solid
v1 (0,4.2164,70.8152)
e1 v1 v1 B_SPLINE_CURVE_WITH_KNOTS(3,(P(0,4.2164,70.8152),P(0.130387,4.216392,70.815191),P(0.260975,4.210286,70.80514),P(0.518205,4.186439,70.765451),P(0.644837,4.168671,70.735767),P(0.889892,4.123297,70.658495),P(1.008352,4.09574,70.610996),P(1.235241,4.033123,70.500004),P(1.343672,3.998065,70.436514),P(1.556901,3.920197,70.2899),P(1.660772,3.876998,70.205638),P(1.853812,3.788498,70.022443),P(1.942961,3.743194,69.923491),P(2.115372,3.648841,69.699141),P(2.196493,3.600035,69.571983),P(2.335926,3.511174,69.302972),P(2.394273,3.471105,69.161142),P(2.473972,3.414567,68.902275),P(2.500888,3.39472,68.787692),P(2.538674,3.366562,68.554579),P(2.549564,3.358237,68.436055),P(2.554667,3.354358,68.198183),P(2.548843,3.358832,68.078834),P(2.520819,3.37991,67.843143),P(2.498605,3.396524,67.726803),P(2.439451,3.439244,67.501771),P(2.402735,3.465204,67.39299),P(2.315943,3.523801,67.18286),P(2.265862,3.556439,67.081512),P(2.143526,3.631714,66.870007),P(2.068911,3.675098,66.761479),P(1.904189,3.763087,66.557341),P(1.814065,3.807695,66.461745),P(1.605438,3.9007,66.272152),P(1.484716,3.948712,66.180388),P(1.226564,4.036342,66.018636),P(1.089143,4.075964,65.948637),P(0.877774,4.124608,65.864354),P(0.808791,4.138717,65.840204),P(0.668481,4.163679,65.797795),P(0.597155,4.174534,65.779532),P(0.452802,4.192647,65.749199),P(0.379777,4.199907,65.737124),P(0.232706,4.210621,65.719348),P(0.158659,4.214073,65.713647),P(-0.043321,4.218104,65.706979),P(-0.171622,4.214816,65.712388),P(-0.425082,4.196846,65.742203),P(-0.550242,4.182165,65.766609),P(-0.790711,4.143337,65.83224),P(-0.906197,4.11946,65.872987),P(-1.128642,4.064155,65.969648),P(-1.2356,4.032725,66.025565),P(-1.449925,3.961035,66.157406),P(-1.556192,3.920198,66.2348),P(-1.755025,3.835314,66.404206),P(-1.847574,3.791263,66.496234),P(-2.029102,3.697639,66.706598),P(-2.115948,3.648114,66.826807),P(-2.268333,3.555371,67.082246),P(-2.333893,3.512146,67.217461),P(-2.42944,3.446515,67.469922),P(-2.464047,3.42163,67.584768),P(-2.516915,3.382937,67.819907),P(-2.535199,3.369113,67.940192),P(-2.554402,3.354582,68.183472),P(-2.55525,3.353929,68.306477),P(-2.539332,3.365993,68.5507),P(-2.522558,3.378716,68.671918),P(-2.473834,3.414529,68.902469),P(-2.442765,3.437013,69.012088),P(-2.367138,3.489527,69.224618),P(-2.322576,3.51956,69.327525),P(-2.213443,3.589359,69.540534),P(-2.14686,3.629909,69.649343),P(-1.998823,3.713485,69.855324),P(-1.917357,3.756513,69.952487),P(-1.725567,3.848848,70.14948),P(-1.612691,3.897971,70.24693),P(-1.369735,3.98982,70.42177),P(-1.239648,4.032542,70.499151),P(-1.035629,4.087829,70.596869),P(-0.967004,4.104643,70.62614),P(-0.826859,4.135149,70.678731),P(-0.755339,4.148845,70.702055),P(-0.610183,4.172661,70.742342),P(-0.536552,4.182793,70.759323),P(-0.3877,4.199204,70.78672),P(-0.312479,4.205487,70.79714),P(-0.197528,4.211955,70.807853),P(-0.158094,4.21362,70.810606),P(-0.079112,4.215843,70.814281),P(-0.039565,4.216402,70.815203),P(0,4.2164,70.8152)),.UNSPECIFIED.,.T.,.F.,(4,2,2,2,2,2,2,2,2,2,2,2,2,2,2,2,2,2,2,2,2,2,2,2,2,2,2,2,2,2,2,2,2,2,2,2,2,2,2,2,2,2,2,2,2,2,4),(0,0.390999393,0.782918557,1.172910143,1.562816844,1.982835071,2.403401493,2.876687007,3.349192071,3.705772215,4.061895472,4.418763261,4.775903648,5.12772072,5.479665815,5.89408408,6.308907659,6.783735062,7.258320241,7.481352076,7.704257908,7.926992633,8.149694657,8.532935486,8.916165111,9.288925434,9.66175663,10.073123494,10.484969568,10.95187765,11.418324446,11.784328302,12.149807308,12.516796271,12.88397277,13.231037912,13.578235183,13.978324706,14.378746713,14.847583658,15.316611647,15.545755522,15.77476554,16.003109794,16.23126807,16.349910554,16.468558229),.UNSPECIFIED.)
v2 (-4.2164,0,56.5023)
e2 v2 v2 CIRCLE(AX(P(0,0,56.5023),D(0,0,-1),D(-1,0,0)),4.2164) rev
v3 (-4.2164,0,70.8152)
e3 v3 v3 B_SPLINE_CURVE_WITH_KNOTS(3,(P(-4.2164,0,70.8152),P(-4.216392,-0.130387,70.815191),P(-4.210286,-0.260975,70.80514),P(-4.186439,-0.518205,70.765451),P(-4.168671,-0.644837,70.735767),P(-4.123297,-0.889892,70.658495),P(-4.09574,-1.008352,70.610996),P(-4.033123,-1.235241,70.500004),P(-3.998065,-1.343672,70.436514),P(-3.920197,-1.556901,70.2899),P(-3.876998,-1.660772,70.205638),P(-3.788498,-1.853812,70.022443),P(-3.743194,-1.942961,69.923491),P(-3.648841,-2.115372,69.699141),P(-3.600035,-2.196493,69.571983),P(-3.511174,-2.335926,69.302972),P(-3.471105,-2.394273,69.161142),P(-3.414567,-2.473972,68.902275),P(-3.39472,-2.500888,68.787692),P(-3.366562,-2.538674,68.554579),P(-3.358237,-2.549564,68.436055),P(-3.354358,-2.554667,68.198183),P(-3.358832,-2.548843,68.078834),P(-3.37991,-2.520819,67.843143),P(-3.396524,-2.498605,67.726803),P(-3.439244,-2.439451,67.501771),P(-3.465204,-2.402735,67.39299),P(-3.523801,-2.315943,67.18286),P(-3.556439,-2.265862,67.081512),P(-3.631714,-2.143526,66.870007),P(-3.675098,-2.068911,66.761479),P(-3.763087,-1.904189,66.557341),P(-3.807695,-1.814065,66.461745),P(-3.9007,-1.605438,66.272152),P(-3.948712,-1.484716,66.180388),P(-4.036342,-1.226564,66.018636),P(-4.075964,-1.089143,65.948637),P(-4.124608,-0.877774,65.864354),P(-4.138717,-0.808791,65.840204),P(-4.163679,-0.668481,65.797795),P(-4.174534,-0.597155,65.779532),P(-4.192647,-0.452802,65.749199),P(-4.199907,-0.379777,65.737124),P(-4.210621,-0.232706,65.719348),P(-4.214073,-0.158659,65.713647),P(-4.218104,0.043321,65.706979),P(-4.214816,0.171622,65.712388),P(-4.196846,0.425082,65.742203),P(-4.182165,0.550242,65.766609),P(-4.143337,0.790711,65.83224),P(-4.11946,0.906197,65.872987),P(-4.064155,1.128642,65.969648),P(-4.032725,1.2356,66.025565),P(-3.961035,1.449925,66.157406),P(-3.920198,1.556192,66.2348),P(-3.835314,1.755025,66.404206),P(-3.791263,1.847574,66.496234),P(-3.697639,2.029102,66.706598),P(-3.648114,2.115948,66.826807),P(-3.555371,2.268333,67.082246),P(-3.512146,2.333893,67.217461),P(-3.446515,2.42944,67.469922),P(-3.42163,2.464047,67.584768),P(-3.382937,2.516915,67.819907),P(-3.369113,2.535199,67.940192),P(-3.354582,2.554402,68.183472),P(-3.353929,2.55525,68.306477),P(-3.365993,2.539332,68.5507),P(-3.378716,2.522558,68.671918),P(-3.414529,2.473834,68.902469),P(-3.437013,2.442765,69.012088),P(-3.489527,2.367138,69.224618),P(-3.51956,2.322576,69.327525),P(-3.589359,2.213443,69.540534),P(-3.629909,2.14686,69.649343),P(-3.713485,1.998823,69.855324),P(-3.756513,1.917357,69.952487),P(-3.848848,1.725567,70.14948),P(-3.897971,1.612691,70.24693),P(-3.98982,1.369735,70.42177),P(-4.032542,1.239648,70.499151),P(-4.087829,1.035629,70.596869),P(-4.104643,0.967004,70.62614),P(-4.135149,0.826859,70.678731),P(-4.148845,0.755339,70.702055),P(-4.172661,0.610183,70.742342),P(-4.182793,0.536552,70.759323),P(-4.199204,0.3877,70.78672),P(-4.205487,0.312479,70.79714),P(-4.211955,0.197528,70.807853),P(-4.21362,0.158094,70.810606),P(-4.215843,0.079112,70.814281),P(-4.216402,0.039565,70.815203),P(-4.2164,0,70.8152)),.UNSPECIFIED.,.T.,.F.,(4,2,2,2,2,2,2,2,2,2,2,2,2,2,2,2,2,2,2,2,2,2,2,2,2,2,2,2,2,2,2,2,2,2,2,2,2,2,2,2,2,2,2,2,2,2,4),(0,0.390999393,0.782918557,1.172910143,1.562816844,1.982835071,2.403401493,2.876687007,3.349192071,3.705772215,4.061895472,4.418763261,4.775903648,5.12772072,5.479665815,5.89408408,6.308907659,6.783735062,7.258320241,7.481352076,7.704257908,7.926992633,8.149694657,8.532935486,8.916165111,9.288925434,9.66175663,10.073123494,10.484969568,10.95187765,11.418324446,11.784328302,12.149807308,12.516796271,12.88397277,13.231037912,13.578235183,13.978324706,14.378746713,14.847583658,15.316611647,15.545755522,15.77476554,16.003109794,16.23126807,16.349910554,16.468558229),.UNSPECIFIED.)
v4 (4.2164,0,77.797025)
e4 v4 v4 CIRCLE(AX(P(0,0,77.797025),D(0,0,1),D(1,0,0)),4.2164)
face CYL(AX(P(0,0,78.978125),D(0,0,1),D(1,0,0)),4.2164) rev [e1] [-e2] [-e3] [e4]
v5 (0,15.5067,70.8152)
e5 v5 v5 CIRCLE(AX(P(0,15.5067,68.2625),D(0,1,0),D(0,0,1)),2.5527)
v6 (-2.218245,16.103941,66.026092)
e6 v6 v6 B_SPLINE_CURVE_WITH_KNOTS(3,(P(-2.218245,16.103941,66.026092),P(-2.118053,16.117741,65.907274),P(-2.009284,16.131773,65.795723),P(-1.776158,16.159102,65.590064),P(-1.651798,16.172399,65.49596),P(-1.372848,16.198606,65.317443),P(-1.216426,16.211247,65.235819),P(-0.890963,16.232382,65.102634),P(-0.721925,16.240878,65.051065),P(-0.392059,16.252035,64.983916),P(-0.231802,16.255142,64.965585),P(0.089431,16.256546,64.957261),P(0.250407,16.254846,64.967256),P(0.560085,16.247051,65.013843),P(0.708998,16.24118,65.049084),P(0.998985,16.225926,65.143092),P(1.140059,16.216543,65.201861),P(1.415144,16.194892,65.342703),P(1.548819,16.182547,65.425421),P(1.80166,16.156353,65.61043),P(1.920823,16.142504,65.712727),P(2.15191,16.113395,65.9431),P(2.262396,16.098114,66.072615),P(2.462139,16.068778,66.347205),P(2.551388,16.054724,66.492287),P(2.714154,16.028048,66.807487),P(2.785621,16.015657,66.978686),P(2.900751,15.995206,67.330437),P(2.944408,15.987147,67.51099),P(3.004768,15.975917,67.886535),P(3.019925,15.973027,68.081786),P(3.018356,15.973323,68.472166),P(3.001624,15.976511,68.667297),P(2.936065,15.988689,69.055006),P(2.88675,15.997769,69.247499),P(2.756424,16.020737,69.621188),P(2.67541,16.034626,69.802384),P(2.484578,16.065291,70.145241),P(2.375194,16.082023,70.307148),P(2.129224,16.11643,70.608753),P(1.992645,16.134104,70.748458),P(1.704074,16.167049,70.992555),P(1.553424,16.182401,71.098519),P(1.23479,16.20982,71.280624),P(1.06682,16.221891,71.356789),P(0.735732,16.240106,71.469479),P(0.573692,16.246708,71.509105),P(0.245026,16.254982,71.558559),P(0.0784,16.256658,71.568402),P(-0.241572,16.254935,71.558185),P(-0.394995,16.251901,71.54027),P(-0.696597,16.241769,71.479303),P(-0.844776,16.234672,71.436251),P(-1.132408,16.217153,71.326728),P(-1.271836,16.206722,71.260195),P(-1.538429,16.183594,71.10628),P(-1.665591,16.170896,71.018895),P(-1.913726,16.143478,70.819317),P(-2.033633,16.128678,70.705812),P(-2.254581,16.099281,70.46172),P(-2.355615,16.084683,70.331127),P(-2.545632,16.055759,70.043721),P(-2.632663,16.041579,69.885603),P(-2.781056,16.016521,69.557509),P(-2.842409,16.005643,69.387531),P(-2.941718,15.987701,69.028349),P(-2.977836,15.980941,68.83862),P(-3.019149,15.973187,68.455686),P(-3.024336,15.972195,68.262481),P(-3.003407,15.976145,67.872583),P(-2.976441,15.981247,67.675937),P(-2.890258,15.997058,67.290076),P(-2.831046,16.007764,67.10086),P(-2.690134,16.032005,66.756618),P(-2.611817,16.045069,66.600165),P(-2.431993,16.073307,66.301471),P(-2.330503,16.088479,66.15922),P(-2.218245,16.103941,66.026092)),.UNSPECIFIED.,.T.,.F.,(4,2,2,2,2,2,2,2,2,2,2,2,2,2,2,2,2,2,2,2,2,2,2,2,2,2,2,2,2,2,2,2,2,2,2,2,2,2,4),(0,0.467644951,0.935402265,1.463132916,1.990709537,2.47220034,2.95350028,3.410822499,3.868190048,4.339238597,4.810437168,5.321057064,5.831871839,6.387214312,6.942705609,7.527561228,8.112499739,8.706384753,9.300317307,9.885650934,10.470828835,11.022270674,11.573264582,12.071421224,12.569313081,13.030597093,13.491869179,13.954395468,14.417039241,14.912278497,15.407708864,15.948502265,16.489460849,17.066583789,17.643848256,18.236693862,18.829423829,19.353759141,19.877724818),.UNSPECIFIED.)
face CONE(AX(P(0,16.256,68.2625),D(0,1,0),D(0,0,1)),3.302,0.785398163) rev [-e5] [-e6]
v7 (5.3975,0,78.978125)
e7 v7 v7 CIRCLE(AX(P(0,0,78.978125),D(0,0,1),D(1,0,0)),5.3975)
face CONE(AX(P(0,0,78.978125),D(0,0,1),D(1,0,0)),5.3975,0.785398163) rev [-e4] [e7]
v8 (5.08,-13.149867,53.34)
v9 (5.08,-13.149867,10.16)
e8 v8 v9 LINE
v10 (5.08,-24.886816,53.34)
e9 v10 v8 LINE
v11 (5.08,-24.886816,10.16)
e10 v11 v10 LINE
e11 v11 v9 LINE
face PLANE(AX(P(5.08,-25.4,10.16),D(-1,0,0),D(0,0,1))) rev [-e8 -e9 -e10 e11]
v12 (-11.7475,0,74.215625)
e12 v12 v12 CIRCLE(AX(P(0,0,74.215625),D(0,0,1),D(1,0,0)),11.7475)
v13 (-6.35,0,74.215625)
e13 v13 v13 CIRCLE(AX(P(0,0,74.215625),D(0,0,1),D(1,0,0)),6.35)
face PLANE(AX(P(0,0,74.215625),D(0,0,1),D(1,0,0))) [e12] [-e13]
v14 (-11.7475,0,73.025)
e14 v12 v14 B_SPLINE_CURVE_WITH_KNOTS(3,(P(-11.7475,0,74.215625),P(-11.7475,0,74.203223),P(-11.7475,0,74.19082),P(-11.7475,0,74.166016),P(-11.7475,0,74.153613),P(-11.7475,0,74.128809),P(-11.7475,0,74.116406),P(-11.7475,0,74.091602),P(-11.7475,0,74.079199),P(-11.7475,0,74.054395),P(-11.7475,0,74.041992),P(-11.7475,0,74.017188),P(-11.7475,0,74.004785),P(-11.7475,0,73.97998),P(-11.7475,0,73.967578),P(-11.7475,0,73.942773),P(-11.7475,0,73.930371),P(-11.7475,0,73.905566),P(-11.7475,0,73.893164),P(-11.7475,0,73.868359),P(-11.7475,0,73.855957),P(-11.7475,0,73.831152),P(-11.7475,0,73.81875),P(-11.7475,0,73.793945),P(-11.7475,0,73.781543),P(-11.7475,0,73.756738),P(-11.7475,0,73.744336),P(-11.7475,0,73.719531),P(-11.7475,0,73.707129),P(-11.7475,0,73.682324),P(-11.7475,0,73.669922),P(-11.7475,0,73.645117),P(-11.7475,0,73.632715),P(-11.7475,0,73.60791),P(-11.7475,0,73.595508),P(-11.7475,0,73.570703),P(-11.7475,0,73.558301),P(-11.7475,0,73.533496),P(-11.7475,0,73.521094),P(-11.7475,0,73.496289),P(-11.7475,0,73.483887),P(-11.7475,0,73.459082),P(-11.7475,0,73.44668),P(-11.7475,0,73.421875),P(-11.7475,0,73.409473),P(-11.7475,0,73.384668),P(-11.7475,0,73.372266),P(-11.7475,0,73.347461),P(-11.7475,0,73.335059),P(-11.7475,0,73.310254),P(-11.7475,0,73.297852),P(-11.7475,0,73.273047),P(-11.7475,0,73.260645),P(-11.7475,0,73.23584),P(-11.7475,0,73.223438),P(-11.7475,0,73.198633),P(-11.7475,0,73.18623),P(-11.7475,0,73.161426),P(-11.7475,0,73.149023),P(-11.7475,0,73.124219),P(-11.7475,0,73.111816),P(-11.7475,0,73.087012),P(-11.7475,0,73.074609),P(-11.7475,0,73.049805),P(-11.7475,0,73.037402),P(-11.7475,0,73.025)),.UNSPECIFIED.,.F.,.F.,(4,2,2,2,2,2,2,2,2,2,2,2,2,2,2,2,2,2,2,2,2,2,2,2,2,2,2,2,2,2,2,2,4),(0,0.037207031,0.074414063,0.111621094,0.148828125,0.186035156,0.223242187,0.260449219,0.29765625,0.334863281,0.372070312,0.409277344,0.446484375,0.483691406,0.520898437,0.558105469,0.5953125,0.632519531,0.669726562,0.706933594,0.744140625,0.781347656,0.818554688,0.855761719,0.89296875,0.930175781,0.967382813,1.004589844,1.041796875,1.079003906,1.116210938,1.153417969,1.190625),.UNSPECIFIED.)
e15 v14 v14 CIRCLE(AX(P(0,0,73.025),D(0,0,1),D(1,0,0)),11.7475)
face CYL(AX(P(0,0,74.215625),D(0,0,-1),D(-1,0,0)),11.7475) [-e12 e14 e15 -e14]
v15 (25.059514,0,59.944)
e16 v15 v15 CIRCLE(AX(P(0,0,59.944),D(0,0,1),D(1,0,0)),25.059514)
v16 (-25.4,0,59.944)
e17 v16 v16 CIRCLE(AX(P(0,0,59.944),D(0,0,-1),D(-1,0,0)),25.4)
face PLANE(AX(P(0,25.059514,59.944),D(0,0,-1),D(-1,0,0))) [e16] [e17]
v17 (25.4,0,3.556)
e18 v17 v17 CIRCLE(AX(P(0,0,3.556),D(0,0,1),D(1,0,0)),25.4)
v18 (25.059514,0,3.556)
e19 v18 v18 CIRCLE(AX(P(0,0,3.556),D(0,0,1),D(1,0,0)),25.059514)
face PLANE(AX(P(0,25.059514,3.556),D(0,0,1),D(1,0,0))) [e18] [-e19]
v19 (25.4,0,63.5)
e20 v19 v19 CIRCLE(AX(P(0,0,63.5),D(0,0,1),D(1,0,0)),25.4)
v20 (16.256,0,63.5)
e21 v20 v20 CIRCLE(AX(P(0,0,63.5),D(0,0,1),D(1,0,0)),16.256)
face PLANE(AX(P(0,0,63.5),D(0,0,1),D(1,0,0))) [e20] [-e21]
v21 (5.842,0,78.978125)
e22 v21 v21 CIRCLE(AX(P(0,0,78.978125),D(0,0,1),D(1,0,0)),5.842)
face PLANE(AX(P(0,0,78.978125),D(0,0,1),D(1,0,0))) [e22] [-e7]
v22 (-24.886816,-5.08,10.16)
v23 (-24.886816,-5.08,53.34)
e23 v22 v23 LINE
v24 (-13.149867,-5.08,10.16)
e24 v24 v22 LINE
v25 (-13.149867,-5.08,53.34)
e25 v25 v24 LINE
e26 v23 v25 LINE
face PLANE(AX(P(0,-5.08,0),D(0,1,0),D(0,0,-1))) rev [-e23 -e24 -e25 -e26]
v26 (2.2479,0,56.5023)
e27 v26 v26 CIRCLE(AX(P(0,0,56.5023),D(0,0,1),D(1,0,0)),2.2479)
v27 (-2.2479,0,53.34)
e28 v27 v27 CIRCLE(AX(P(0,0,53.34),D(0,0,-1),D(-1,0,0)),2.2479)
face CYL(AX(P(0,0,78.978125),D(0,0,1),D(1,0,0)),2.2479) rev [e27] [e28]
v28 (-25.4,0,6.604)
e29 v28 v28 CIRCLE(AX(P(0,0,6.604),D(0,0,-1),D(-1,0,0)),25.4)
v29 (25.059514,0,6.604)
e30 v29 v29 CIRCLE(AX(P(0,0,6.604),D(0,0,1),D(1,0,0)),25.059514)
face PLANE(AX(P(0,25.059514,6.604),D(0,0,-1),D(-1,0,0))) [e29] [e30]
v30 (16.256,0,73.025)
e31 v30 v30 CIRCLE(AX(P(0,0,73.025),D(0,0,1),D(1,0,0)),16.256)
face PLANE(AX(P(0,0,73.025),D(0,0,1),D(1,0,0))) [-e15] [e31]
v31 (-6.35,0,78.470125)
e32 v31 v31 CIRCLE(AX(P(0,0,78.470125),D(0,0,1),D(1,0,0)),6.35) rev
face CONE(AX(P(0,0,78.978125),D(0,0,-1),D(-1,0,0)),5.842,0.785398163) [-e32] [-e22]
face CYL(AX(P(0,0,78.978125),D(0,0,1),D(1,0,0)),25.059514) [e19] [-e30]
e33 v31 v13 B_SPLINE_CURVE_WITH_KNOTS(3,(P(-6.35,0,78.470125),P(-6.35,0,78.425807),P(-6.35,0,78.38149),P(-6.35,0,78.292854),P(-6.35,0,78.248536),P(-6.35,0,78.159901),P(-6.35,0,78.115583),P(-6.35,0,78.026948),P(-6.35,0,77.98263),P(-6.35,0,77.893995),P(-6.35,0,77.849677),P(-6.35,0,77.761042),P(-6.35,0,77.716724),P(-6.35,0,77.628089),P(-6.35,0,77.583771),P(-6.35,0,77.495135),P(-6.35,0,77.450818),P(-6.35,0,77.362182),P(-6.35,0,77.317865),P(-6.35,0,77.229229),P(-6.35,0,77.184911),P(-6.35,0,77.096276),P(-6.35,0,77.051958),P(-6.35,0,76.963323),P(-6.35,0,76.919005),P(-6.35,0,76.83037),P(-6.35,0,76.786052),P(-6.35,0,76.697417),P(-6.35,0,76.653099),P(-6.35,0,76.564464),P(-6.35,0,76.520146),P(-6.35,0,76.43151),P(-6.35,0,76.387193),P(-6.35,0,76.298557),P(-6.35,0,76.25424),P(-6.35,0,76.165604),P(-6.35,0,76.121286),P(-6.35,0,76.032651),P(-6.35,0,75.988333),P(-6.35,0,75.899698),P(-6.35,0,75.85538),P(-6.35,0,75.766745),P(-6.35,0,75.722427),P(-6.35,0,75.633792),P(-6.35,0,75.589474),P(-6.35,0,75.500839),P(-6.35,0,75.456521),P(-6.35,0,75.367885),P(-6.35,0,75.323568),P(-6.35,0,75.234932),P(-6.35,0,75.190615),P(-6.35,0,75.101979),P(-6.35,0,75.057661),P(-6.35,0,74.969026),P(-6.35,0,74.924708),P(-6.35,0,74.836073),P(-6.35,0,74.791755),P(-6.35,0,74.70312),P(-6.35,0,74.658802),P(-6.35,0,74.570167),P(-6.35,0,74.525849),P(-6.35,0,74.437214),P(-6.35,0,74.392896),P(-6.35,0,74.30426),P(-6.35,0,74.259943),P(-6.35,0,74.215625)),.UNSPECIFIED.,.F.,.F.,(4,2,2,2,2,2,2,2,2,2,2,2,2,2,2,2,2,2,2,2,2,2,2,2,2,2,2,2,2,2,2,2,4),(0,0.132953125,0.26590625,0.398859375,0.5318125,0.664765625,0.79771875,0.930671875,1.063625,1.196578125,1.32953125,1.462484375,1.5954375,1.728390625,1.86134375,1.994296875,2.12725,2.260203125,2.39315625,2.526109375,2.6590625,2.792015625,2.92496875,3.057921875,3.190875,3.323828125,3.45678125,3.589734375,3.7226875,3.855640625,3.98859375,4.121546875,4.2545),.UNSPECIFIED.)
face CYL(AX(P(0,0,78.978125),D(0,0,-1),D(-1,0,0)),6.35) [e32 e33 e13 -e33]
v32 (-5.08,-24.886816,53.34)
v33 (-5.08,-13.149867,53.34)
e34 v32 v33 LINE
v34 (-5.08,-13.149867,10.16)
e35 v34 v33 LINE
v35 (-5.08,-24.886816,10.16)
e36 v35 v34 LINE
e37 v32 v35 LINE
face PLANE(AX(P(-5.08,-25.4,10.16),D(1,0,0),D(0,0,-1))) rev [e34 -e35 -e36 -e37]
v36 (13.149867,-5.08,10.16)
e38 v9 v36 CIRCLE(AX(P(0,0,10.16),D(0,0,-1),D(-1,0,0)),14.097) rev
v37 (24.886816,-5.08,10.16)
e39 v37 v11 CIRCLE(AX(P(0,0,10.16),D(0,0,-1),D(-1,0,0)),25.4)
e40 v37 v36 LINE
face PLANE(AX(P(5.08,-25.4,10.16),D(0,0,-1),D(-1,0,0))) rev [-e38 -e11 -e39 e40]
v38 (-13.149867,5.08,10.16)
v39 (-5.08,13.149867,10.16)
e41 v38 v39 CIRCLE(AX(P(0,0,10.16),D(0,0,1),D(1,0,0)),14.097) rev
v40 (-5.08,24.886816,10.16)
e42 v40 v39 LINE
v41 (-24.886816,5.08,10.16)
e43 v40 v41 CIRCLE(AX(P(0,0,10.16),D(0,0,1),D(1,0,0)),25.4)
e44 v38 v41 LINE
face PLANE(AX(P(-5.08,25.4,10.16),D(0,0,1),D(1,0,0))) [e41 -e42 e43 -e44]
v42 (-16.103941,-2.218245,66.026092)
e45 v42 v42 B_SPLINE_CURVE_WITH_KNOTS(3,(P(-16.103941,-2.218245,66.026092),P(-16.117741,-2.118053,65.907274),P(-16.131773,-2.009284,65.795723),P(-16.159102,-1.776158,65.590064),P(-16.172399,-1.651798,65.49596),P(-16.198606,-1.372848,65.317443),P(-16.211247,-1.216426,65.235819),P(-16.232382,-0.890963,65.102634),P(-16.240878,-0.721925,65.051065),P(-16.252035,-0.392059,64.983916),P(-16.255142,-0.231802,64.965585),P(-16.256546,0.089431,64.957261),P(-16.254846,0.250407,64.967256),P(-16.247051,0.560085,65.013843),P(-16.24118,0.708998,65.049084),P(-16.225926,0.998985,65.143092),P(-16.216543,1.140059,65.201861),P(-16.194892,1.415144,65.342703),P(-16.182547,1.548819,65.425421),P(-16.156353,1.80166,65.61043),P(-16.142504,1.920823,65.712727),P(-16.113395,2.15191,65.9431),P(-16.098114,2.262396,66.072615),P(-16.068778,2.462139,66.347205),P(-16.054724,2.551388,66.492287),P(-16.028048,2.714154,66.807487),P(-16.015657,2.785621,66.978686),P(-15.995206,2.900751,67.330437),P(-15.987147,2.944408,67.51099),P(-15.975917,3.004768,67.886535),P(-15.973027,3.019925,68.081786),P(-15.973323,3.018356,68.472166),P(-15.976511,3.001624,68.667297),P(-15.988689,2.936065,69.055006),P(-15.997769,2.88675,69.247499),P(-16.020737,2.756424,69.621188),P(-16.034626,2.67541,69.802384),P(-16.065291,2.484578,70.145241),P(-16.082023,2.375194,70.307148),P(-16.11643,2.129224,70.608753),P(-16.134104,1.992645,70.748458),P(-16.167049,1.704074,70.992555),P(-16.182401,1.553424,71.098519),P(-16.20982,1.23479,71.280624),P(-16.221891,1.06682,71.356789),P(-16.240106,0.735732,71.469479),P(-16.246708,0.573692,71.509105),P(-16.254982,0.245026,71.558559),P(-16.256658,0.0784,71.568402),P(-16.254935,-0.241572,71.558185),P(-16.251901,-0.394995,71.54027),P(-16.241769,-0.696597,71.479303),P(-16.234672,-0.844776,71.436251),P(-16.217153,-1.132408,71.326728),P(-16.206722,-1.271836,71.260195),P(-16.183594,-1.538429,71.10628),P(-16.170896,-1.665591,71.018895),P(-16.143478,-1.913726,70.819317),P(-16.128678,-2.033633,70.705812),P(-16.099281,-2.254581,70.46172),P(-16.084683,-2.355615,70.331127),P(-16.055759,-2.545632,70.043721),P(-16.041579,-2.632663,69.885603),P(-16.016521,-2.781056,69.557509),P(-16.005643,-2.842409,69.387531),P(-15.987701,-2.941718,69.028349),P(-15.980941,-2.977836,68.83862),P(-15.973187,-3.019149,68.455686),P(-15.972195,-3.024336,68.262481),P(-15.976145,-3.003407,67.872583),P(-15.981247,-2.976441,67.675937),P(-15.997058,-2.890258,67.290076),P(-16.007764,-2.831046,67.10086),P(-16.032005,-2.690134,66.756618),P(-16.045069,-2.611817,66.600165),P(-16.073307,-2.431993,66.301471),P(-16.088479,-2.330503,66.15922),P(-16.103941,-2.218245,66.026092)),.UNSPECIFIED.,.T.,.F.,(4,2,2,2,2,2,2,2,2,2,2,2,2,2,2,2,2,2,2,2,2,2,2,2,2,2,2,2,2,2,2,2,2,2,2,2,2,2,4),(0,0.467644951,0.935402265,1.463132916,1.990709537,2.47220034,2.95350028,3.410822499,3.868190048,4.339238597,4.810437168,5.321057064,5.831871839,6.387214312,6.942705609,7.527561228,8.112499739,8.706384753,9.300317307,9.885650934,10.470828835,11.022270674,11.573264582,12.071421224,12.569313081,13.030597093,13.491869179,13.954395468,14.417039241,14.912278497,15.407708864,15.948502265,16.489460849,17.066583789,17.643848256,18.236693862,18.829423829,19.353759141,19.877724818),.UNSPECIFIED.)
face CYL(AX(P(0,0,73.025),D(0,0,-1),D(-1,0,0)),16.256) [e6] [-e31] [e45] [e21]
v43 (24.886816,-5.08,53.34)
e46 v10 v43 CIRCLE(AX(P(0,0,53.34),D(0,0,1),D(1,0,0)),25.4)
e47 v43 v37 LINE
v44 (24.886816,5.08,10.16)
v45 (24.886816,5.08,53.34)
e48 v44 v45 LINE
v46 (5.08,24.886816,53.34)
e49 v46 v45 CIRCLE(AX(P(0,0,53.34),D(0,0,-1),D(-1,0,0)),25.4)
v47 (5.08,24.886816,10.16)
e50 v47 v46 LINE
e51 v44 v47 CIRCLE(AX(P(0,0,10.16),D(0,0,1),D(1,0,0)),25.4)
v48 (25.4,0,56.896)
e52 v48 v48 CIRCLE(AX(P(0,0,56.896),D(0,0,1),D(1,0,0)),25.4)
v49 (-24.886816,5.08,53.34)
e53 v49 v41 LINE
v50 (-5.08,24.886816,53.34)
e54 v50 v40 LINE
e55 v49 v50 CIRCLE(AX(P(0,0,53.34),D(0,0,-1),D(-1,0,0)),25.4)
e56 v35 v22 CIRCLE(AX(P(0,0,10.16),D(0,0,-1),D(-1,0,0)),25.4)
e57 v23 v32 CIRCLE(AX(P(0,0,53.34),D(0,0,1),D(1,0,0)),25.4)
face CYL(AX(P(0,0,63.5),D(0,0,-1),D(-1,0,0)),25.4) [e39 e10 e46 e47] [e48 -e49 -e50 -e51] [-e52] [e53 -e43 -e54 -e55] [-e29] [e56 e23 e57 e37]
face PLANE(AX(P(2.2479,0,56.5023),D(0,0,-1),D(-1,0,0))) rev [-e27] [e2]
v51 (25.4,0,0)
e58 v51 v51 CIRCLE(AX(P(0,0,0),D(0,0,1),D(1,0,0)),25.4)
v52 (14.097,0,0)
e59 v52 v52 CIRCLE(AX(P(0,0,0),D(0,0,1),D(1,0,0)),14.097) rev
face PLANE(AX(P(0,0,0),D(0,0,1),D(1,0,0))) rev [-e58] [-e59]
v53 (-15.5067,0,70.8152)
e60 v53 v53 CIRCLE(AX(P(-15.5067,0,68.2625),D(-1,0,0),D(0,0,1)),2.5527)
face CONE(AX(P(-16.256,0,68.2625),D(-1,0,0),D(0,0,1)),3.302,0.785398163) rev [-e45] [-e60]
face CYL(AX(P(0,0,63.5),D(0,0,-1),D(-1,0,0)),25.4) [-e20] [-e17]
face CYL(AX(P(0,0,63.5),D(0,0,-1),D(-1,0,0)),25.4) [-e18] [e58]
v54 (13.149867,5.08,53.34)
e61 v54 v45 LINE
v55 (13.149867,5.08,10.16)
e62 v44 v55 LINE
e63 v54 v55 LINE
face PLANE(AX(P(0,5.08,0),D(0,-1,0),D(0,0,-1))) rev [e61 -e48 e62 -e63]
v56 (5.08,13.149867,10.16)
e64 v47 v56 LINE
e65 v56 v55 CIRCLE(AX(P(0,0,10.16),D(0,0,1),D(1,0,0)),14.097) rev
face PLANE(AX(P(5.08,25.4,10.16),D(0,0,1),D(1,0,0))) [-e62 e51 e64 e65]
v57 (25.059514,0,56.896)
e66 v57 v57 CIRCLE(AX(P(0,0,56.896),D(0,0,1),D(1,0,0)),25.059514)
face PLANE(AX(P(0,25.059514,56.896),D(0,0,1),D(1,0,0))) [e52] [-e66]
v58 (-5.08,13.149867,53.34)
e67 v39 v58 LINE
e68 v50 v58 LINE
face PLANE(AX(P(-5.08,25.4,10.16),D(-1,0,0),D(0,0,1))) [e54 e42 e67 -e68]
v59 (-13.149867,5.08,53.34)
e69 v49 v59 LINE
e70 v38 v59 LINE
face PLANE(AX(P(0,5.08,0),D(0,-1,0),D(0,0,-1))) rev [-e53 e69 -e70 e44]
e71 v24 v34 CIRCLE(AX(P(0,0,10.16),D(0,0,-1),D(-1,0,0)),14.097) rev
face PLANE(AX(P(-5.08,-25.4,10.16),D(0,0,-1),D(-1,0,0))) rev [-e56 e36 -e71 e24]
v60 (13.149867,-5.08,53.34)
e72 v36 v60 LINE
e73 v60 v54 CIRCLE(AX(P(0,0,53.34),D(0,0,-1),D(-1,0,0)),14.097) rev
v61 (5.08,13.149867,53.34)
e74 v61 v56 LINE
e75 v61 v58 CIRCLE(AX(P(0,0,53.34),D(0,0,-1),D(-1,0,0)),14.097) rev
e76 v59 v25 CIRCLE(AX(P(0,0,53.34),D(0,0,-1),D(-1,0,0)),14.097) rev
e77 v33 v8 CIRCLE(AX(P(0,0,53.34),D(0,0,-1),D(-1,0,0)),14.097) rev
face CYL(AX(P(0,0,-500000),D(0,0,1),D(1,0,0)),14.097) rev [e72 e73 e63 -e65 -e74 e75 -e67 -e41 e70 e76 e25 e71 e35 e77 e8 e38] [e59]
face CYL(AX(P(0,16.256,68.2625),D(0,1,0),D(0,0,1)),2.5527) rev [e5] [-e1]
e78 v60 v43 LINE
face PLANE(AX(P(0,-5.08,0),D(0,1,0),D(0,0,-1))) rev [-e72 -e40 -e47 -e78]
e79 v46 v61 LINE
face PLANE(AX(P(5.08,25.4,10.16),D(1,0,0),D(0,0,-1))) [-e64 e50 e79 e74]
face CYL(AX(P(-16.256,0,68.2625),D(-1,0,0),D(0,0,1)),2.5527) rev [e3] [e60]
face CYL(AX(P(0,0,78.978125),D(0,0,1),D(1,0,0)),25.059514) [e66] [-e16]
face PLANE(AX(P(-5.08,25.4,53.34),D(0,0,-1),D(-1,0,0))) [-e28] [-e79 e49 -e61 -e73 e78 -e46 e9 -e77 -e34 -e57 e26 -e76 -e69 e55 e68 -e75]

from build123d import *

# Parameters (mm, degrees)
SKETCH1_R                                      = 25.4
BOSS_EXTRUDE1_DEPTH                            = 63.5
SKETCH2_R                                      = 14.097
CUT_EXTRUDE1_DEPTH                             = 63.5
SKETCH4_W                                      = 20.32
SKETCH4_H                                      = 43.18
CUT_EXTRUDE3_DEPTH                             = 75.876167103
SKETCH8_R                                      = 14.097
BOSS_EXTRUDE3_DEPTH                            = 10.16
SKETCH10_R                                     = 16.256
BOSS_EXTRUDE4_DEPTH                            = 9.525
SKETCH26_R                                     = 11.7475
BOSS_EXTRUDE8_DEPTH                            = 1.190625
SKETCH11_R                                     = 6.35
BOSS_EXTRUDE5_DEPTH                            = 4.7625
CBORE_FOR_8_SOCKET_HEAD_CAP_SCREW1_D           = 4.4958
CBORE_FOR_8_SOCKET_HEAD_CAP_SCREW1_CBORE_D     = 7.9375
CBORE_FOR_8_SOCKET_HEAD_CAP_SCREW1_CBORE_DEPTH = 22.475825
SKETCH17_W                                     = 3.048
SKETCH17_H                                     = 0.508
CIRPATTERN1_COUNT                              = 2
CIRPATTERN1_ANGLE                              = 90
CHAMFER1_SIZE                                  = 0.508


# Read off the part's stored shape, not the designer's step: 1/4-20 Tapped Hole1, 3/8-24 Tapped Hole1
with BuildPart() as part:
    # Sketch1 → Boss-Extrude1 (new body)
    with BuildSketch(Plane.XY):
        Circle(SKETCH1_R)
    extrude(amount=BOSS_EXTRUDE1_DEPTH)

    # Sketch2 → Cut-Extrude1 (cut)
    with BuildSketch(Plane.XY.offset(63.5)):
        Circle(SKETCH2_R)
    extrude(amount=-CUT_EXTRUDE1_DEPTH, mode=Mode.SUBTRACT)

    # Sketch4 → Cut-Extrude3 (cut, through all)
    with BuildSketch(Plane(origin=(0, 5.08, 0), x_dir=(1, 0, 0), z_dir=(0, 1, 0))):
        with Locations((-15.24, -31.75)):
            Rectangle(SKETCH4_W, SKETCH4_H)
        with Locations((15.24, -31.75)):
            Rectangle(SKETCH4_W, SKETCH4_H)
    cut_extrude3 = extrude(amount=CUT_EXTRUDE3_DEPTH, mode=Mode.SUBTRACT)

    # Mirror1: Cut-Extrude3 across plane
    add(cut_extrude3.mirror(Plane.ZX), mode=Mode.SUBTRACT)

    # Sketch8 → Boss-Extrude3 (add)
    with BuildSketch(Plane.XY.offset(63.5)):
        Circle(SKETCH8_R)
    extrude(amount=-BOSS_EXTRUDE3_DEPTH)

    # Sketch10 → Boss-Extrude4 (add)
    with BuildSketch(Plane.XY.offset(63.5)):
        with Locations(Location((0, 0, 0), (0, 0, 180))):
            Circle(SKETCH10_R)
    extrude(amount=BOSS_EXTRUDE4_DEPTH)

    # Sketch26 → Boss-Extrude8 (add)
    with BuildSketch(Plane.XY.offset(73.025)):
        with Locations(Location((0, 0, 0), (0, 0, 180))):
            Circle(SKETCH26_R)
    extrude(amount=BOSS_EXTRUDE8_DEPTH)

    # Sketch11 → Boss-Extrude5 (add)
    with BuildSketch(Plane.XY.offset(74.215625)):
        with Locations(Location((0, 0, 0), (0, 0, 180))):
            Circle(SKETCH11_R)
    extrude(amount=BOSS_EXTRUDE5_DEPTH)

    # CBORE for #8 Socket Head Cap Screw1 (through all)
    with Locations(Plane.XY.offset(78.978125)):
        with Locations((0, 0)):
            CounterBoreHole(CBORE_FOR_8_SOCKET_HEAD_CAP_SCREW1_D / 2, CBORE_FOR_8_SOCKET_HEAD_CAP_SCREW1_CBORE_D / 2, CBORE_FOR_8_SOCKET_HEAD_CAP_SCREW1_CBORE_DEPTH)

    # Sketch17 → Cut-Revolve5 (revolve, cut)
    with BuildSketch(Plane(origin=(0, 0, 0), x_dir=(0, 0, -1), z_dir=(1, 0, 0)), mode=Mode.PRIVATE) as cut_revolve5_sk:
        with Locations((-58.42, 25.313514496)):
            Rectangle(SKETCH17_W, SKETCH17_H)
        with Locations((-5.08, 25.313514496)):
            Rectangle(SKETCH17_W, SKETCH17_H)
    revolve(cut_revolve5_sk.sketch.rotate(Axis((0, 0, 78.978125), (0, 0, -1)), 90), axis=Axis((0, 0, 78.978125), (0, 0, -1)), mode=Mode.SUBTRACT)

    # 1/4-20 Tapped Hole1 outline → 1/4-20 Tapped Hole1 (revolve, cut)
    with BuildSketch(Plane.YX.offset(-68.2625)):
        Polygon((0, -16.256120693), (3.302120693, -16.256120693), (2.5527, -15.5067), (2.5527, -3.038383775), (0, -3.038383775), align=None)
    f_1_4_20_tapped_hole1 = revolve(axis=Axis((0, 0, 68.2625), (1, 0, 0)), mode=Mode.SUBTRACT)

    # 3/8-24 Tapped Hole1 outline → 3/8-24 Tapped Hole1 (revolve, cut)
    with BuildSketch(Plane.XZ):
        Polygon((3.96875, 56.5023), (4.2164, 56.5023), (4.2164, 77.797025), (5.3975, 78.978125), (3.96875, 78.978125), align=None)
    revolve(axis=Axis((0, 0, 0), (0, 0, 1)), mode=Mode.SUBTRACT)

    # CirPattern1: 1/4-20 Tapped Hole1 ×2 about axis
    cirpattern1_axis = Axis((0, 0, 73.025), (0, 0, -1))
    for i in range(1, CIRPATTERN1_COUNT):
        add(f_1_4_20_tapped_hole1.rotate(cirpattern1_axis, i * CIRPATTERN1_ANGLE / (CIRPATTERN1_COUNT - 1)), mode=Mode.SUBTRACT)

    # Chamfer1
    chamfer1_edges = [part.edges().sort_by_distance(p)[0] for p in [
        (6.35, 0, 78.978125),
    ]]
    chamfer(chamfer1_edges, length=CHAMFER1_SIZE)


solid = part.part
